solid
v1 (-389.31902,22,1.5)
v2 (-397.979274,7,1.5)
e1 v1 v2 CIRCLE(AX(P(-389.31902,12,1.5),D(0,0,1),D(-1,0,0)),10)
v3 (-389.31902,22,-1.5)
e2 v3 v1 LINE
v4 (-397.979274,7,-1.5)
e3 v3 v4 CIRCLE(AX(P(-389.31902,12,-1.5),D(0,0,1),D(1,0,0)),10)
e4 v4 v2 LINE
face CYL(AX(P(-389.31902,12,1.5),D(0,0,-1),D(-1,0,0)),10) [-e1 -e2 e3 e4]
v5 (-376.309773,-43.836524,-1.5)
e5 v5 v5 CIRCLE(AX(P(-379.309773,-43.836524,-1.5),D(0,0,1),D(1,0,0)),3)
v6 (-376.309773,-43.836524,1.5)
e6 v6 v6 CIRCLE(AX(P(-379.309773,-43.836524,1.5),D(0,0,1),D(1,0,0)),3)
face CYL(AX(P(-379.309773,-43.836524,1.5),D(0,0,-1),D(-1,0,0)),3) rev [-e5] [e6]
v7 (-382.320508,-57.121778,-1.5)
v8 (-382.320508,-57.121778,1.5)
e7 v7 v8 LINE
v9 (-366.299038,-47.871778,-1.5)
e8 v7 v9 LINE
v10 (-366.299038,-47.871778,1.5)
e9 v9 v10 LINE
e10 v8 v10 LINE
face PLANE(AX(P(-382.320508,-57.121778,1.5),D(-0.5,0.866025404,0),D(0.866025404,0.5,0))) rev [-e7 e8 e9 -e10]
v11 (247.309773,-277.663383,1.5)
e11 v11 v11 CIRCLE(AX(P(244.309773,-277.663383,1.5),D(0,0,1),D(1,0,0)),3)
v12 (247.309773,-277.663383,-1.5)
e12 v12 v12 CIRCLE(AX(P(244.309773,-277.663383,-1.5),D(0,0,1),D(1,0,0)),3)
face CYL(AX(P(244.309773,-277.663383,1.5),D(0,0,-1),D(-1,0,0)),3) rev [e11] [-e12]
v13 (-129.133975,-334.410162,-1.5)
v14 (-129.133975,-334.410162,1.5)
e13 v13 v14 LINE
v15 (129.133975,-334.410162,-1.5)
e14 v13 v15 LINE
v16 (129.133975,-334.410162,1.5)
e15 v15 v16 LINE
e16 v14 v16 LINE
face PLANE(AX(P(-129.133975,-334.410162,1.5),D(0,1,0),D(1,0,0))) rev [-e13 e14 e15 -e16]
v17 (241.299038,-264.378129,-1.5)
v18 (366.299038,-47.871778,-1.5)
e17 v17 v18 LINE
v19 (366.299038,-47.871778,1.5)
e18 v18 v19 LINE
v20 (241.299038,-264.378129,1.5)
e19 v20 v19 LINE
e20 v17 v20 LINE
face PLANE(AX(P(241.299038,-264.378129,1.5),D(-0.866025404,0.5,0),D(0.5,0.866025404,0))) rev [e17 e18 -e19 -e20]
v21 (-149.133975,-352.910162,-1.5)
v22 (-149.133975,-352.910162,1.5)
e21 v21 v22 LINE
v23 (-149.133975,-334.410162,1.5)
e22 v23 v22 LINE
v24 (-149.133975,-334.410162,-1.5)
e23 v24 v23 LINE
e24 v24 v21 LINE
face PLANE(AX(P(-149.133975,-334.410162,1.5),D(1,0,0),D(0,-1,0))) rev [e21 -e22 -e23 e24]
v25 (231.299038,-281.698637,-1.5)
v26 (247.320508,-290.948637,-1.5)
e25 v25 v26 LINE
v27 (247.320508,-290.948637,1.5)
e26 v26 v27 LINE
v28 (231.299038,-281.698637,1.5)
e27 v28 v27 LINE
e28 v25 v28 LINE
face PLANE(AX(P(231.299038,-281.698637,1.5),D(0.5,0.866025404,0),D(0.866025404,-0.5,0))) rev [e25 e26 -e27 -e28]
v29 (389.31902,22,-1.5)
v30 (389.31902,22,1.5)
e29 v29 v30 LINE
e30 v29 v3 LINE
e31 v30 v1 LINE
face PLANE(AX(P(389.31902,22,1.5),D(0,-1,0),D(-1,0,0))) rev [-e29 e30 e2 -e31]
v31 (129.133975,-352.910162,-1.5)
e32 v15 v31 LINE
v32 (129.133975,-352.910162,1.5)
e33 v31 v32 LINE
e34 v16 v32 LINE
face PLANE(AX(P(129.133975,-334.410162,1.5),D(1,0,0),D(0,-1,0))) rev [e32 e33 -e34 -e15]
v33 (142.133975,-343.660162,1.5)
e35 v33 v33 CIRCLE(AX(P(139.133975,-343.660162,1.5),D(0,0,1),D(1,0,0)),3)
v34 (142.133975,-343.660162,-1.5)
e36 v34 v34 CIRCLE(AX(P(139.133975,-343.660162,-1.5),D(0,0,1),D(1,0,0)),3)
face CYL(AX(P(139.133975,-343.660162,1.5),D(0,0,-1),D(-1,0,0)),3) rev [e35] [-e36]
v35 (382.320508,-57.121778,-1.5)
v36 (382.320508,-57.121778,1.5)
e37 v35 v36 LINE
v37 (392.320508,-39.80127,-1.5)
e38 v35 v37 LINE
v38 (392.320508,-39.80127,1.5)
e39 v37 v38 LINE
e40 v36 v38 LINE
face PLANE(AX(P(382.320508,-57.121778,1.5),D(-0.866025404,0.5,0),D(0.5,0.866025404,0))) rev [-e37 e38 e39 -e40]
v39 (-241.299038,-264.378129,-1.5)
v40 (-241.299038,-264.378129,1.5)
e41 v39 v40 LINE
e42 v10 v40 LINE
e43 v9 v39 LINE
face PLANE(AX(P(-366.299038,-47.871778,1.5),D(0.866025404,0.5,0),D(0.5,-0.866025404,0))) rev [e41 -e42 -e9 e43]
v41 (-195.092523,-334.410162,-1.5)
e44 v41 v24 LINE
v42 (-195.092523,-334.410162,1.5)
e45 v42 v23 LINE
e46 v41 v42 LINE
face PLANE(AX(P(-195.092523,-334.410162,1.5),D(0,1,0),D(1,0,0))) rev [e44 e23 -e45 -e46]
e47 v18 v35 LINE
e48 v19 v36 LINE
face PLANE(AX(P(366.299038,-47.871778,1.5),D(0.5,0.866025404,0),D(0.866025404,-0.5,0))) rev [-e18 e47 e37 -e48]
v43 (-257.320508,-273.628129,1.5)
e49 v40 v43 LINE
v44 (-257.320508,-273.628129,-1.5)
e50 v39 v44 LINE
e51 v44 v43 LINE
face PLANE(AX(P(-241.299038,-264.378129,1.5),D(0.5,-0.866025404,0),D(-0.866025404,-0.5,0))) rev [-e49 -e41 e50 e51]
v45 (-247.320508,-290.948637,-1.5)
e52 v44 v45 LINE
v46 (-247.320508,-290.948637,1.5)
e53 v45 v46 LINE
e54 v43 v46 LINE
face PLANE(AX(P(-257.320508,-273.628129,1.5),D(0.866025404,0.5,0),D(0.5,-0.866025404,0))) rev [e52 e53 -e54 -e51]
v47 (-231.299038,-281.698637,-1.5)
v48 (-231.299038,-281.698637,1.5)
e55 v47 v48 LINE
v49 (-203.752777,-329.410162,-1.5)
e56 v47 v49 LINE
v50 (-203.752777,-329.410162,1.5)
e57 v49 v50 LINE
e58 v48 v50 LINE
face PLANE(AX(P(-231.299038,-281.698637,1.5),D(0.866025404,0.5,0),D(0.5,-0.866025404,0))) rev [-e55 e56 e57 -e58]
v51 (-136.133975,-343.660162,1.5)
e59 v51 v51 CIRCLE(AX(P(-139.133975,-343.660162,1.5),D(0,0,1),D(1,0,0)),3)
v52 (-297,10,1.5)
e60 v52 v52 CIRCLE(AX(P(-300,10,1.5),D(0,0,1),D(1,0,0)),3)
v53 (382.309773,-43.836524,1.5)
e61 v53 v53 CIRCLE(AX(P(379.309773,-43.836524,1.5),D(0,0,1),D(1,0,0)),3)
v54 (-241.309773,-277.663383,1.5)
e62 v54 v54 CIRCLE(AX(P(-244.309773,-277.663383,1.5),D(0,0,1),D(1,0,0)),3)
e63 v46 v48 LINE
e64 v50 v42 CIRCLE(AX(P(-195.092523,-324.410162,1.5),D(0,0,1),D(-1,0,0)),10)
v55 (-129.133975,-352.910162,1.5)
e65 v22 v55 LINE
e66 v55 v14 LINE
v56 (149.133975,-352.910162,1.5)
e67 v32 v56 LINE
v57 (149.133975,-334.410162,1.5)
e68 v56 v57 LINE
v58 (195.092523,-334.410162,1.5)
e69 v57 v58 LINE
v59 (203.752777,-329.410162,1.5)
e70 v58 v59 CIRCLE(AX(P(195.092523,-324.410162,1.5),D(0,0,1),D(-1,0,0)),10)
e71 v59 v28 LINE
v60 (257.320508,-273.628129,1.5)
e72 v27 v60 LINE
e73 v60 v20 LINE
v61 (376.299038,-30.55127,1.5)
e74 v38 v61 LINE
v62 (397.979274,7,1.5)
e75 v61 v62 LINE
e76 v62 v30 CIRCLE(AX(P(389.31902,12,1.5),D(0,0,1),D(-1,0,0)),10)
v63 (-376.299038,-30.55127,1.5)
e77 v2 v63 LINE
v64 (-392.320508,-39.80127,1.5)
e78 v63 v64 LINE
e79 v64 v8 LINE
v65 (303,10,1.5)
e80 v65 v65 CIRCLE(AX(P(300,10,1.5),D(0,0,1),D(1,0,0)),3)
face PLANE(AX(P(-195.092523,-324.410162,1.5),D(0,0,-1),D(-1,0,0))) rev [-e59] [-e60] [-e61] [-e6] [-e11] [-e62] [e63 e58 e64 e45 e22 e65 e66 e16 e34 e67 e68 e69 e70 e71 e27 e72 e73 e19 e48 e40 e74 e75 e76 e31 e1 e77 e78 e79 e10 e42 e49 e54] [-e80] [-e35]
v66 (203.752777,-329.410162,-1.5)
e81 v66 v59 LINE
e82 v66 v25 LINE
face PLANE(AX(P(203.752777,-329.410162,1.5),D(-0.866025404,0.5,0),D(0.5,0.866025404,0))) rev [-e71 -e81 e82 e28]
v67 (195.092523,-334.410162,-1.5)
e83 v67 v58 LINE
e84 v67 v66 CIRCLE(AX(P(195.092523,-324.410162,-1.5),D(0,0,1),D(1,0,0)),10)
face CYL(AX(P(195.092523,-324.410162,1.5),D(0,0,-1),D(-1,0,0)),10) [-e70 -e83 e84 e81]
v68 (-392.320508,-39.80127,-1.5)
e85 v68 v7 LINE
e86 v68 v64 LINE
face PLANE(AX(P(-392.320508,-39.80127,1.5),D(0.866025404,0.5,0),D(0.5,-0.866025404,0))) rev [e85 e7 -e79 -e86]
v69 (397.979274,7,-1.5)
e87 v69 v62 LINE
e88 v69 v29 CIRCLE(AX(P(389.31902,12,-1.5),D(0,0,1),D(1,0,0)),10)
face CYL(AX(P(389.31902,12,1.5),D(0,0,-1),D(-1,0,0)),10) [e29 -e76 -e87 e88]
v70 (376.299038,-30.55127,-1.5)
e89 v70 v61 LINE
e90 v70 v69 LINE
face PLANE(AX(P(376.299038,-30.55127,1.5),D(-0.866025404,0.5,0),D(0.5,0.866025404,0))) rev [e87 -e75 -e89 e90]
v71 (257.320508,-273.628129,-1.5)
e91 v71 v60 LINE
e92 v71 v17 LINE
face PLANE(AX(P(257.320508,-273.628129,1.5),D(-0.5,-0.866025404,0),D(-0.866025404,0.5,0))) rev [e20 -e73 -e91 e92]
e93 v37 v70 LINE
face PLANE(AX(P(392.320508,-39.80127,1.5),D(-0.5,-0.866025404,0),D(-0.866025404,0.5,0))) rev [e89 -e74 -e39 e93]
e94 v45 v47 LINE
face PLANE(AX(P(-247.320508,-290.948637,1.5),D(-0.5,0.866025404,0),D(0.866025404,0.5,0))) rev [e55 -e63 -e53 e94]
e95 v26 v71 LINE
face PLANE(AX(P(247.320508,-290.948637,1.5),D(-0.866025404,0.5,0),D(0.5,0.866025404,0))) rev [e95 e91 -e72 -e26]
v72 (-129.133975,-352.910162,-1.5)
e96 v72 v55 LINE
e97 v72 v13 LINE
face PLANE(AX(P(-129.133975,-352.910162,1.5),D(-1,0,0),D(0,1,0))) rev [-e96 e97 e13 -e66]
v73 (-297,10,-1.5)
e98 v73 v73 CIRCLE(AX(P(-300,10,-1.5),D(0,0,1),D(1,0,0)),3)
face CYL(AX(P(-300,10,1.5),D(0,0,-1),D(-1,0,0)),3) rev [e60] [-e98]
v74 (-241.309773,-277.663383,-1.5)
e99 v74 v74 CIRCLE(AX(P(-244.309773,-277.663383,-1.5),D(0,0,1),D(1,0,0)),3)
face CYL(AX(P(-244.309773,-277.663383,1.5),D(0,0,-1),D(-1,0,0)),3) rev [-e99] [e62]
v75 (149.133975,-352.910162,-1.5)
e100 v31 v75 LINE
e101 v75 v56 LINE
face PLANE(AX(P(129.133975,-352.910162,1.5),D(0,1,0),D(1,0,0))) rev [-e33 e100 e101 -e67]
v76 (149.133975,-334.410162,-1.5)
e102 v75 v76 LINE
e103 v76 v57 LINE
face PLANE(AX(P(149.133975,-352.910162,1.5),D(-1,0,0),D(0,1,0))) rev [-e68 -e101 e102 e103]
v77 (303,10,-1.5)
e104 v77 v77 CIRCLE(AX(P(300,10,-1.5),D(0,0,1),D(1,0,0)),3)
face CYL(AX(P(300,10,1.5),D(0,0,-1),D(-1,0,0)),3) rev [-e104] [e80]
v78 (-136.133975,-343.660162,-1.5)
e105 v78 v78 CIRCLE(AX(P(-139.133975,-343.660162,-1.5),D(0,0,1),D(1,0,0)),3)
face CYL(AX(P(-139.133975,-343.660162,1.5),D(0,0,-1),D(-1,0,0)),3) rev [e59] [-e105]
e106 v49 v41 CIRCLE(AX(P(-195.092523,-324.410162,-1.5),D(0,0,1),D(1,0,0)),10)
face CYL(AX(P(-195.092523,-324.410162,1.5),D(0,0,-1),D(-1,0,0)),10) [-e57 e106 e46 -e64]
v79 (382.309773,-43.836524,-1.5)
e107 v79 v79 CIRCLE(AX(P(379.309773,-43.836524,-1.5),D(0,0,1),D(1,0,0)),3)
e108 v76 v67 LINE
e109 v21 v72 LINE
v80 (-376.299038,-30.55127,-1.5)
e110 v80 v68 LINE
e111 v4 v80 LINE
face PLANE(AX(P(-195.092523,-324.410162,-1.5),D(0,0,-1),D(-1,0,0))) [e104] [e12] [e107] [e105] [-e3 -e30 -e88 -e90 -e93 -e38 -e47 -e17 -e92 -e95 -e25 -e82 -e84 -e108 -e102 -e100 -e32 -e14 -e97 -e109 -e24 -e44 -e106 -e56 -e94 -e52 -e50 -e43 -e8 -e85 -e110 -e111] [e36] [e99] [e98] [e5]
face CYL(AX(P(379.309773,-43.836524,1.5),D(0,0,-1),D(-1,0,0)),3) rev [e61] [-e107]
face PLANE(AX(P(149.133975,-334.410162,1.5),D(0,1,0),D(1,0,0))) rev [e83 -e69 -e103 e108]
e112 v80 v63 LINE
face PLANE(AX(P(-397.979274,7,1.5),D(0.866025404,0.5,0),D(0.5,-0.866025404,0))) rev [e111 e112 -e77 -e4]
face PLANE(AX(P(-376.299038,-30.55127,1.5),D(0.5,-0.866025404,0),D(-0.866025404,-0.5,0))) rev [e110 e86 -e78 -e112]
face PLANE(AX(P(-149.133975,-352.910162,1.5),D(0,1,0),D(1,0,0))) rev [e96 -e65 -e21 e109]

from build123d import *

# Parameters (mm, degrees)
SKETCH_1_R              = 3
EXTRUDE_1_DEPTH         = 1.5
SHEET_START             = -1.5
SHEET_METAL_1_OUTLINE_R = 3
SHEET_METAL_1_DEPTH     = 1.5


# Read off the part's stored shape, not the designer's step: Преобразовать-Твердое тело1
with BuildPart() as part:
    # Sketch 1 → Бобышка-Вытянуть1 (new body)
    with BuildSketch(Plane.XY):
        with BuildLine():
            Line((389.31902002, 22), (-389.31902002, 22))
            ThreePointArc((-389.31902002, 22), (-397.979274058, 17), (-397.979274058, 7))
            Line((-397.979274058, 7), (-376.299038106, -30.551270189))
            Line((-376.299038106, -30.551270189), (-392.320508076, -39.801270189))
            Line((-392.320508076, -39.801270189), (-382.320508076, -57.121778265))
            Line((-382.320508076, -57.121778265), (-366.299038106, -47.871778265))
            Line((-366.299038106, -47.871778265), (-241.299038106, -264.378129211))
            Line((-241.299038106, -264.378129211), (-257.320508076, -273.628129211))
            Line((-257.320508076, -273.628129211), (-247.320508076, -290.948637287))
            Line((-247.320508076, -290.948637287), (-231.299038106, -281.698637287))
            Line((-231.299038106, -281.698637287), (-203.75277675, -329.410161514))
            ThreePointArc((-203.75277675, -329.410161514), (-200.092522712, -333.070415552), (-195.092522712, -334.410161514))
            Line((-195.092522712, -334.410161514), (-149.133974596, -334.410161514))
            Line((-149.133974596, -334.410161514), (-149.133974596, -352.910161514))
            Line((-149.133974596, -352.910161514), (-129.133974596, -352.910161514))
            Line((-129.133974596, -352.910161514), (-129.133974596, -334.410161514))
            Line((-129.133974596, -334.410161514), (129.133974596, -334.410161514))
            Line((129.133974596, -334.410161514), (129.133974596, -352.910161514))
            Line((129.133974596, -352.910161514), (149.133974596, -352.910161514))
            Line((149.133974596, -352.910161514), (149.133974596, -334.410161514))
            Line((149.133974596, -334.410161514), (195.092522712, -334.410161514))
            ThreePointArc((195.092522712, -334.410161514), (200.092522712, -333.070415552), (203.75277675, -329.410161514))
            Line((203.75277675, -329.410161514), (231.299038106, -281.698637287))
            Line((231.299038106, -281.698637287), (247.320508076, -290.948637287))
            Line((247.320508076, -290.948637287), (257.320508076, -273.628129211))
            Line((257.320508076, -273.628129211), (241.299038106, -264.378129211))
            Line((241.299038106, -264.378129211), (366.299038106, -47.871778265))
            Line((366.299038106, -47.871778265), (382.320508076, -57.121778265))
            Line((382.320508076, -57.121778265), (392.320508076, -39.801270189))
            Line((392.320508076, -39.801270189), (376.299038106, -30.551270189))
            Line((376.299038106, -30.551270189), (397.979274058, 7))
            ThreePointArc((397.979274058, 7), (397.979274058, 17), (389.31902002, 22))
        make_face()
        with Locations((244.309773091, -277.663383249)):
            Circle(SKETCH_1_R, mode=Mode.SUBTRACT)
        with Locations((379.309773091, -43.836524227)):
            Circle(SKETCH_1_R, mode=Mode.SUBTRACT)
        with Locations((139.133974596, -343.660161514)):
            Circle(SKETCH_1_R, mode=Mode.SUBTRACT)
        with Locations((-139.133974596, -343.660161514)):
            Circle(SKETCH_1_R, mode=Mode.SUBTRACT)
        with Locations((-244.309773091, -277.663383249)):
            Circle(SKETCH_1_R, mode=Mode.SUBTRACT)
        with Locations((-379.309773091, -43.836524227)):
            Circle(SKETCH_1_R, mode=Mode.SUBTRACT)
        with Locations((300, 10)):
            Circle(SKETCH_1_R, mode=Mode.SUBTRACT)
        with Locations((-300, 10)):
            Circle(SKETCH_1_R, mode=Mode.SUBTRACT)
    extrude(amount=EXTRUDE_1_DEPTH)

    # Sheet Metal 1 outline → Sheet Metal 1 (add)
    with BuildSketch(Plane.XY.offset(SHEET_START)):
        with BuildLine():
            Line((-149.133974596, -334.410161514), (-149.133974596, -352.910161514))
            Line((-149.133974596, -352.910161514), (-129.133974596, -352.910161514))
            Line((-129.133974596, -352.910161514), (-129.133974596, -334.410161514))
            Line((-129.133974596, -334.410161514), (129.133974596, -334.410161514))
            Line((129.133974596, -334.410161514), (129.133974596, -352.910161514))
            Line((129.133974596, -352.910161514), (149.133974596, -352.910161514))
            Line((149.133974596, -352.910161514), (149.133974596, -334.410161514))
            Line((149.133974596, -334.410161514), (195.092522712, -334.410161514))
            ThreePointArc((195.092522712, -334.410161514), (200.092522712, -333.070415552), (203.75277675, -329.410161514))
            Line((203.75277675, -329.410161514), (231.299038106, -281.698637287))
            Line((231.299038106, -281.698637287), (247.320508076, -290.948637287))
            Line((247.320508076, -290.948637287), (257.320508076, -273.628129211))
            Line((257.320508076, -273.628129211), (241.299038106, -264.378129211))
            Line((241.299038106, -264.378129211), (366.299038106, -47.871778265))
            Line((366.299038106, -47.871778265), (382.320508076, -57.121778265))
            Line((382.320508076, -57.121778265), (392.320508076, -39.801270189))
            Line((392.320508076, -39.801270189), (376.299038106, -30.551270189))
            Line((376.299038106, -30.551270189), (397.979274058, 7))
            ThreePointArc((397.979274058, 7), (397.979274058, 17), (389.31902002, 22))
            Line((389.31902002, 22), (-389.31902002, 22))
            ThreePointArc((-389.31902002, 22), (-397.979274058, 17), (-397.979274058, 7))
            Line((-397.979274058, 7), (-376.299038106, -30.551270189))
            Line((-376.299038106, -30.551270189), (-392.320508076, -39.801270189))
            Line((-392.320508076, -39.801270189), (-382.320508076, -57.121778265))
            Line((-382.320508076, -57.121778265), (-366.299038106, -47.871778265))
            Line((-366.299038106, -47.871778265), (-241.299038106, -264.378129211))
            Line((-241.299038106, -264.378129211), (-257.320508076, -273.628129211))
            Line((-257.320508076, -273.628129211), (-247.320508076, -290.948637287))
            Line((-247.320508076, -290.948637287), (-231.299038106, -281.698637287))
            Line((-231.299038106, -281.698637287), (-203.75277675, -329.410161514))
            ThreePointArc((-203.75277675, -329.410161514), (-200.092522712, -333.070415552), (-195.092522712, -334.410161514))
            Line((-195.092522712, -334.410161514), (-149.133974596, -334.410161514))
        make_face()
        with Locations((-244.309773091, -277.663383249)):
            Circle(SHEET_METAL_1_OUTLINE_R, mode=Mode.SUBTRACT)
        with Locations((-139.133974596, -343.660161514)):
            Circle(SHEET_METAL_1_OUTLINE_R, mode=Mode.SUBTRACT)
        with Locations((139.133974596, -343.660161514)):
            Circle(SHEET_METAL_1_OUTLINE_R, mode=Mode.SUBTRACT)
        with Locations((244.309773091, -277.663383249)):
            Circle(SHEET_METAL_1_OUTLINE_R, mode=Mode.SUBTRACT)
        with Locations((-379.309773091, -43.836524227)):
            Circle(SHEET_METAL_1_OUTLINE_R, mode=Mode.SUBTRACT)
        with Locations((-300, 10)):
            Circle(SHEET_METAL_1_OUTLINE_R, mode=Mode.SUBTRACT)
        with Locations((379.309773091, -43.836524227)):
            Circle(SHEET_METAL_1_OUTLINE_R, mode=Mode.SUBTRACT)
        with Locations((300, 10)):
            Circle(SHEET_METAL_1_OUTLINE_R, mode=Mode.SUBTRACT)
    extrude(amount=SHEET_METAL_1_DEPTH)


solid = part.part
